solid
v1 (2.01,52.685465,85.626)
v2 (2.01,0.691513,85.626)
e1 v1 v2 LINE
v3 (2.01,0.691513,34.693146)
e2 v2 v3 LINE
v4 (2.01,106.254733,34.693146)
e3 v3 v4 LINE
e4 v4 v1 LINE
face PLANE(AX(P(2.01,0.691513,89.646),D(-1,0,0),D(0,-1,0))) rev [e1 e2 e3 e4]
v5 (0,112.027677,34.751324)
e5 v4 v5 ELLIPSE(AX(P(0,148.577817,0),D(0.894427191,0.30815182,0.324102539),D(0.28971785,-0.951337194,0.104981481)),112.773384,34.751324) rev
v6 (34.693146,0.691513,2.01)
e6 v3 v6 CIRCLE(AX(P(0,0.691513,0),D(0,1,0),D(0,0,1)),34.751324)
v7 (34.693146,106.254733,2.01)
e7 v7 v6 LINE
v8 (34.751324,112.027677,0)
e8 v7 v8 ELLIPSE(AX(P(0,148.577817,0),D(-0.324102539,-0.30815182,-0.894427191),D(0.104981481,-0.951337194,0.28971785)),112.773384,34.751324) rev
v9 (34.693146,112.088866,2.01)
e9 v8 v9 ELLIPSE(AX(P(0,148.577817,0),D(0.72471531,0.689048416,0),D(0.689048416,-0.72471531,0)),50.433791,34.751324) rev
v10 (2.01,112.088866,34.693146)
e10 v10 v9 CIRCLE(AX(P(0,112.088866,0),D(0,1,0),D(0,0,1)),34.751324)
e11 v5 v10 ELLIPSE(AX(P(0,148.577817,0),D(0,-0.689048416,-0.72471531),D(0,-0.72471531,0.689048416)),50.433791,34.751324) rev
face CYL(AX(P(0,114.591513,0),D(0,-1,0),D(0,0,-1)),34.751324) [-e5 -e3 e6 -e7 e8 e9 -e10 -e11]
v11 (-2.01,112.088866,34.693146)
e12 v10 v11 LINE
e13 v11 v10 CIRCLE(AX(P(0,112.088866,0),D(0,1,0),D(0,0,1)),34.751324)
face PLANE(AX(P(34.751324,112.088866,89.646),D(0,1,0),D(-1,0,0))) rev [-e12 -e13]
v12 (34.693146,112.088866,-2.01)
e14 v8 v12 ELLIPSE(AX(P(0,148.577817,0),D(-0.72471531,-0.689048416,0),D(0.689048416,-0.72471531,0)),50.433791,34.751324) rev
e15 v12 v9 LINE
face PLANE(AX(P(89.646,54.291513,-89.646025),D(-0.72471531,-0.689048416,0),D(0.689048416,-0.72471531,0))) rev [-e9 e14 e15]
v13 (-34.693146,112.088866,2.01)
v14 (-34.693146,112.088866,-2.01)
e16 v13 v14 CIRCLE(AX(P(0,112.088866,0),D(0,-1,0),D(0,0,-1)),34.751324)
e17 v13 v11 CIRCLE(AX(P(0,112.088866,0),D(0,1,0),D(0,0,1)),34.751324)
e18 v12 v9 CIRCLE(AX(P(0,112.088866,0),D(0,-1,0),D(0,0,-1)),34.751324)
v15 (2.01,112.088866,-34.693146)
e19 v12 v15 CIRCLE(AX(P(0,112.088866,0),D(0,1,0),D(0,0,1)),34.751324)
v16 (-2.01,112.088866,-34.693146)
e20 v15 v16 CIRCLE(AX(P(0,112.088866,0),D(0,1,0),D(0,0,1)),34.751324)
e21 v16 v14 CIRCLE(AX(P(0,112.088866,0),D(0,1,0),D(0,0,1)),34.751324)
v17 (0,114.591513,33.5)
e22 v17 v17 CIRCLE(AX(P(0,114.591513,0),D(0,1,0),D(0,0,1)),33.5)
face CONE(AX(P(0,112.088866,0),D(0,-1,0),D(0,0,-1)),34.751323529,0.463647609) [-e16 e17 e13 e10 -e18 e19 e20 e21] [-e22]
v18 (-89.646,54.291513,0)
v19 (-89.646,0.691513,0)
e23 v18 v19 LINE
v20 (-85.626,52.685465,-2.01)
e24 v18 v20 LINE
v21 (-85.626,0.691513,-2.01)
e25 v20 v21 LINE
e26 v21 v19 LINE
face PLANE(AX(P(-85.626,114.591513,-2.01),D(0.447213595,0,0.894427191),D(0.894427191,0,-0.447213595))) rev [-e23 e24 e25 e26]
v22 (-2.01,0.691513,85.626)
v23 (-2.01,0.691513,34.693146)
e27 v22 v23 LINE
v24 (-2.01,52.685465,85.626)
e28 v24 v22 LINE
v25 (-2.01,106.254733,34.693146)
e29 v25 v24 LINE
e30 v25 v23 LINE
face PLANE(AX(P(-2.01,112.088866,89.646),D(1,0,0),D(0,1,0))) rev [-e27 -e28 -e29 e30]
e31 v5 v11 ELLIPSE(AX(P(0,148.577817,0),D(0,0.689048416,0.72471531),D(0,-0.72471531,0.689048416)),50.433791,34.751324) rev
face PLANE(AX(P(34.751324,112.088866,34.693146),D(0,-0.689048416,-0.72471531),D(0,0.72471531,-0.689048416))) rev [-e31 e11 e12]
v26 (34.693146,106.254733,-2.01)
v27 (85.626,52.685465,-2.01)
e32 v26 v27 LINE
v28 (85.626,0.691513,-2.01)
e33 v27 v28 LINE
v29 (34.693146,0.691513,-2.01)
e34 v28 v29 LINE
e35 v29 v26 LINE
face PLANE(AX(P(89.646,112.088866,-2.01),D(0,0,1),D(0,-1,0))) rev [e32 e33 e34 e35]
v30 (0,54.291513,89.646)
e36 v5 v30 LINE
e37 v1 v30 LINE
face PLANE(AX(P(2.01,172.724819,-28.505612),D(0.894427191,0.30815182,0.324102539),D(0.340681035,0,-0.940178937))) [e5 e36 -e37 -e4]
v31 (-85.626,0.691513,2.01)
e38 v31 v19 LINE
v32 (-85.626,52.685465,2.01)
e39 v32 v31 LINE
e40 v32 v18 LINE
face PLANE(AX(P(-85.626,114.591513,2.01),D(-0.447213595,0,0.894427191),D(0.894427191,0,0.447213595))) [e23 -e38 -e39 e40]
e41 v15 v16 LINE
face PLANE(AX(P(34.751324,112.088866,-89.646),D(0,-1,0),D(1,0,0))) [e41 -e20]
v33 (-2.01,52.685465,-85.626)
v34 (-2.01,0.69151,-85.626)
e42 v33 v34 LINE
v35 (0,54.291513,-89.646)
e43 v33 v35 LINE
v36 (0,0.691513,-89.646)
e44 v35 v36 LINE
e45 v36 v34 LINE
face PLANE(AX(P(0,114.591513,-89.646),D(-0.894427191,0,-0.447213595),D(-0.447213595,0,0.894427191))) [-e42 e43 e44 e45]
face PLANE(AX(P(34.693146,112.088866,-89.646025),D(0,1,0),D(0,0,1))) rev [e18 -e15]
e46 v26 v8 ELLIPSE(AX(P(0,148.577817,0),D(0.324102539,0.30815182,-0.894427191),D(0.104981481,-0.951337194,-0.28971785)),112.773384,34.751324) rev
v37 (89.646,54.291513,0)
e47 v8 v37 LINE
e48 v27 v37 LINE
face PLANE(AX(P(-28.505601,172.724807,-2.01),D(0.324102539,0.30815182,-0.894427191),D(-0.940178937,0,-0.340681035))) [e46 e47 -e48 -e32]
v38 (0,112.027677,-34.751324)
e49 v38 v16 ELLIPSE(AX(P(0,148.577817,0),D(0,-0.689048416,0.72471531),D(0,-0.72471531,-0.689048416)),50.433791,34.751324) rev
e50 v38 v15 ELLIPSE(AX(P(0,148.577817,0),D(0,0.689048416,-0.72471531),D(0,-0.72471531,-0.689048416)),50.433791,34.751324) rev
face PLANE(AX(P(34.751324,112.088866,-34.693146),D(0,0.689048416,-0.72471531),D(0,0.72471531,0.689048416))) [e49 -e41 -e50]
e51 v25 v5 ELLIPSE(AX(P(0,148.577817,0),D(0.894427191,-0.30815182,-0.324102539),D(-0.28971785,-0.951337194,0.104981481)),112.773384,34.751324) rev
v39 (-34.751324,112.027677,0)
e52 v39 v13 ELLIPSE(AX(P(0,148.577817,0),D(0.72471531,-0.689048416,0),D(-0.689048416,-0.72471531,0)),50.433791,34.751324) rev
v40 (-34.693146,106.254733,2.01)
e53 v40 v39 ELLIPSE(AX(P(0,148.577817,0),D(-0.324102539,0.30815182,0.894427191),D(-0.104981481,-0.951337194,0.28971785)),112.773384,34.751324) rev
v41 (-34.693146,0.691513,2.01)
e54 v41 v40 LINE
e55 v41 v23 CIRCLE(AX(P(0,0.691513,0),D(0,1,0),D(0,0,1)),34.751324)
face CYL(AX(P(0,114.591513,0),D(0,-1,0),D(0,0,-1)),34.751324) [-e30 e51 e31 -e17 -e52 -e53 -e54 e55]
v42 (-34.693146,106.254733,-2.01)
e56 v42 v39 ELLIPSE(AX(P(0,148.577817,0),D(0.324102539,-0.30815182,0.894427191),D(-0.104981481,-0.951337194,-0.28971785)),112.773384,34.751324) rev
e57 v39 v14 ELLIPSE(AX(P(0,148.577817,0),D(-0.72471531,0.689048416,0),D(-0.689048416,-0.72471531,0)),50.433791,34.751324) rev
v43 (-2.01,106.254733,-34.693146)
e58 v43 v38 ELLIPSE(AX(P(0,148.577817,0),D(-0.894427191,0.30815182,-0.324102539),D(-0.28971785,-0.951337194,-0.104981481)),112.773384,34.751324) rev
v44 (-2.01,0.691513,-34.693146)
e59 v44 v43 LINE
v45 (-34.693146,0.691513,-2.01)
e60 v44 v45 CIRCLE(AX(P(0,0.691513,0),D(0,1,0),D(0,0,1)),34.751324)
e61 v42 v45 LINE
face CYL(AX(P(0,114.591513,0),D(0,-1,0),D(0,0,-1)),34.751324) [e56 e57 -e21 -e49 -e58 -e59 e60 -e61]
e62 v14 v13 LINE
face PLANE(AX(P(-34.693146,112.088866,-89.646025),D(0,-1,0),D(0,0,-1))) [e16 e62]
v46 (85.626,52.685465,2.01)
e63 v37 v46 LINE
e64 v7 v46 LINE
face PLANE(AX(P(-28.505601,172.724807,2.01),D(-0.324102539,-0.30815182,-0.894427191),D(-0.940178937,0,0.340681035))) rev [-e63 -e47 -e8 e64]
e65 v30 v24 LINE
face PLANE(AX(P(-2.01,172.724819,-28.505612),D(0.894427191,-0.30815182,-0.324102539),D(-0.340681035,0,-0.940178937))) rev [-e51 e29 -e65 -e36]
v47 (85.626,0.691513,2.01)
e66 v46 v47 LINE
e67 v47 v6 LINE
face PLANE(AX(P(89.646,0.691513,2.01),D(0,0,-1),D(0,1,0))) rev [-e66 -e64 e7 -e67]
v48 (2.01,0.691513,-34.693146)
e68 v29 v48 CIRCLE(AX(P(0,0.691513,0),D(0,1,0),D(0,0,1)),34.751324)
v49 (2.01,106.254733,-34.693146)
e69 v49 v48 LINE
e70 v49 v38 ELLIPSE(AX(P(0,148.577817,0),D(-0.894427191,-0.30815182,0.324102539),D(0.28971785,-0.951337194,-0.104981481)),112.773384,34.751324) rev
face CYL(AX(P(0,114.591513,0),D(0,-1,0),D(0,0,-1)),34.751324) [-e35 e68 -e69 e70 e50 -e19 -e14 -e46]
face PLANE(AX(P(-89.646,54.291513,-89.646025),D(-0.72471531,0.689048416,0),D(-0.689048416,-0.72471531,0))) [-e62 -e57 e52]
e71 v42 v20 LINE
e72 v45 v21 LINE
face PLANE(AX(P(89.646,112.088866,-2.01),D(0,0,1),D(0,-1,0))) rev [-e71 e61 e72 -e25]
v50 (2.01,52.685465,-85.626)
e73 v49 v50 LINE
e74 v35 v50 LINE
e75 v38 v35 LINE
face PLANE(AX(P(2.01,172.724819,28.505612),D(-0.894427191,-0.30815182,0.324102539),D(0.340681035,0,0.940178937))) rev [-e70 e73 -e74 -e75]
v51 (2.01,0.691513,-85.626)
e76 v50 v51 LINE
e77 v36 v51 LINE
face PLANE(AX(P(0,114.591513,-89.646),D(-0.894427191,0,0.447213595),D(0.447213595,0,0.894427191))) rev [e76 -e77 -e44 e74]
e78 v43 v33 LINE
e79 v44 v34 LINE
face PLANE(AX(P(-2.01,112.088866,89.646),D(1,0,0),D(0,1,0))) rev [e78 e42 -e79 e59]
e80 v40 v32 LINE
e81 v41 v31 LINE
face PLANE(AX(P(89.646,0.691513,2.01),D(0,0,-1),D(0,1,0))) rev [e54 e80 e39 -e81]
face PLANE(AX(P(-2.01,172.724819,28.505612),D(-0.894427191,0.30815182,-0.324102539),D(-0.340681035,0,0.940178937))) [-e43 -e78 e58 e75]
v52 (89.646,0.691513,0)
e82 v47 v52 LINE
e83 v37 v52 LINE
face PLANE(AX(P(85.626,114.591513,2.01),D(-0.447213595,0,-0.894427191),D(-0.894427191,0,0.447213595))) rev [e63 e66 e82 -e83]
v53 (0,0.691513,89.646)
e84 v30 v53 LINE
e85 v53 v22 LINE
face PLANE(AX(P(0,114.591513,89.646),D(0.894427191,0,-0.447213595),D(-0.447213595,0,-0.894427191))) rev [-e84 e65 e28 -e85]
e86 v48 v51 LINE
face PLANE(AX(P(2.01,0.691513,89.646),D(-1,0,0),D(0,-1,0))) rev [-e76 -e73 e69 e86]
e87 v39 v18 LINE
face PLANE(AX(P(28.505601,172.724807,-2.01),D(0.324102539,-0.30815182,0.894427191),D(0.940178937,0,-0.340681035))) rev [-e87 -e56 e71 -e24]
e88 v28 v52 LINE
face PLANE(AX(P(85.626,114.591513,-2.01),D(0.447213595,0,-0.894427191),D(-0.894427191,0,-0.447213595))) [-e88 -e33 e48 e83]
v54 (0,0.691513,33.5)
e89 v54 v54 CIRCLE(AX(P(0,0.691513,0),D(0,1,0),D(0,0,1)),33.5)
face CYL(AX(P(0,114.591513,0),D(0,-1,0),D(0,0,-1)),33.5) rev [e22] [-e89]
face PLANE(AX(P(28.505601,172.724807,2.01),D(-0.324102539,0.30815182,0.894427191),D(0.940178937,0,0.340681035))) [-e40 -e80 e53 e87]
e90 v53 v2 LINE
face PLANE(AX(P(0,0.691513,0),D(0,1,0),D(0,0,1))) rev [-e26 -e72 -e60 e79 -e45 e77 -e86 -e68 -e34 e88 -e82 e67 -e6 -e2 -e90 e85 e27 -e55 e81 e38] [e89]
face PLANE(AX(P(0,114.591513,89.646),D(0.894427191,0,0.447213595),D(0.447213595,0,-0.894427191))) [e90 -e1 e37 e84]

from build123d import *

# Parameters (mm, degrees)
SKETCH1_R                                     = 35.27
SKETCH1_R_2                                   = 34
BOSS_EXTRUDE1_DEPTH                           = 115.6
SKETCH3_W                                     = 4.08
SKETCH3_H                                     = 113.06
BOSS_EXTRUDE2_DEPTH                           = 90.984
CUT_EXTRUDE1_DEPTH                            = 152.767863384
CUT_EXTRUDE4_DEPTH                            = 152.279281979
MIRROR4_AT_THE_SECOND_PLANE_COPY_1_DEPTH      = 152.279281979
CUT_EXTRUDE5_REACH                            = 175.905
CUT_EXTRUDE5_END_RADIUS                       = 35.27
MIRROR5_AT_THE_SECOND_PLANE_COPY_1_REACH      = 175.905
MIRROR5_AT_THE_SECOND_PLANE_COPY_1_END_RADIUS = 35.27
SKETCH12_W                                    = 4.08
SKETCH12_H                                    = 113.06
BOSS_EXTRUDE3_DEPTH                           = 90.984
CUT_EXTRUDE6_DEPTH                            = 175.054338734
CUT_EXTRUDE7_DEPTH                            = 173.972646716
MIRROR6_START                                 = -1
MIRROR6_DEPTH                                 = 114.06
MIRROR6_START_2                               = -2.04
MIRROR6_2_DEPTH                               = 4.08
MIRROR6_START_3                               = 40.689281773
MIRROR6_3_OUTLINE_W                           = 8
MIRROR6_3_OUTLINE_H                           = 61
MIRROR6_3_DEPTH                               = 3.310718227
CUT_EXTRUDE8_REACH                            = 195.073
CUT_EXTRUDE8_END_RADIUS                       = 35.27
MIRROR7_AT_THE_SECOND_PLANE_COPY_1_REACH      = 195.073
MIRROR7_AT_THE_SECOND_PLANE_COPY_1_END_RADIUS = 35.27
CUT_EXTRUDE9_DEPTH                            = 173.972646716
CUT_EXTRUDE9_DEPTH_BACK                       = 173.972646716
SKETCH17_R                                    = 34
SCALE2_SCALE                                  = 0.985294118


with BuildPart() as part:
    # Sketch1 → Boss-Extrude1 (new body)
    with BuildSketch(Plane(origin=(0, 0, 0), x_dir=(1, 0, 0), z_dir=(0, 1, 0))):
        with Locations(Location((0, 0, 0), (0, 0, 270))):
            Circle(SKETCH1_R)
        with Locations(Location((0, 0, 0), (0, 0, 270))):
            Circle(SKETCH1_R_2, mode=Mode.SUBTRACT)
    extrude(amount=BOSS_EXTRUDE1_DEPTH)

    # Sketch2 → Cut-Revolve3 (revolve, cut)
    with BuildSketch(Plane(origin=(0, 0, 0), x_dir=(0, 0, -1), z_dir=(1, 0, 0))):
        Polygon((-35.27, 113.06), (-35.27, 115.6), (-34, 115.6), align=None)
    revolve(axis=Axis((0, 115.6, 0), (0, -1, 0)), mode=Mode.SUBTRACT)

    # Sketch3 → Boss-Extrude2 (add, symmetric)
    with BuildSketch(Plane.XY):
        with Locations((0, 56.53)):
            Rectangle(SKETCH3_W, SKETCH3_H)
    extrude(amount=BOSS_EXTRUDE2_DEPTH, both=True)

    # Sketch4 → Cut-Extrude1 (cut, symmetric)
    with BuildSketch(Plane.ZY.offset(2.04)):
        Polygon((35.210954261, 113.06), (90.984, 54.4), (90.984, 113.06), align=None)
    cut_extrude1 = extrude(amount=CUT_EXTRUDE1_DEPTH, both=True, mode=Mode.SUBTRACT)

    # Mirror3: Cut-Extrude1 across plane
    add(cut_extrude1.mirror(Plane.XY), mode=Mode.SUBTRACT)

    # Sketch7 → Cut-Extrude4 (cut, symmetric)
    with BuildSketch(Plane.XZ):
        Polygon((0, 90.984), (-2.04, 86.904), (-2.04, 90.984), align=None)
    cut_extrude4 = extrude(amount=CUT_EXTRUDE4_DEPTH, both=True, mode=Mode.SUBTRACT)

    # Mirror4: Cut-Extrude4 across plane
    add(cut_extrude4.mirror(Plane(origin=(0, 0, 0), x_dir=(0, 0, 1), z_dir=(1, 0, 0))), mode=Mode.SUBTRACT)

    # Mirror4 at the second plane: Cut-Extrude4 across plane
    add(cut_extrude4.mirror(Plane.XY), mode=Mode.SUBTRACT)

    # Mirror4 at the second plane copy 1 sketc → Mirror4 at the second plane copy 1 (cut, symmetric)
    with BuildSketch(Plane(origin=(0, 0, 0), x_dir=(-1, 0, 0), z_dir=(0, -1, 0))):
        Polygon((0, 90.984), (-2.04, 86.904), (-2.04, 90.984), align=None)
    extrude(amount=MIRROR4_AT_THE_SECOND_PLANE_COPY_1_DEPTH, both=True, mode=Mode.SUBTRACT)

    # Cut-Extrude5: up to this cylinder (the profile starts outside it)
    cut_extrude5_end = Plane(origin=(0, 53.462894, 0), z_dir=(0, -1, 0)) * Cylinder(CUT_EXTRUDE5_END_RADIUS, 423.35, mode=Mode.PRIVATE)
    # Sketch11 → Cut-Extrude5 (cut, up to the surface)
    with BuildSketch(Plane(origin=(0, -16.862580362, -16.032687791), x_dir=(1, 0, 0), z_dir=(0, 0.7247153095275539, 0.6890484163949453)), mode=Mode.PRIVATE) as cut_extrude5_sk1:
        Polygon((0, 103.421731574), (-2.04, 103.421731574), (-2.04, 99.341731574), align=None)
    cut_extrude5_tool1 = extrude(cut_extrude5_sk1.sketch, amount=CUT_EXTRUDE5_REACH, mode=Mode.PRIVATE) - cut_extrude5_end
    cut_extrude5 = cut_extrude5_tool1.solids().sort_by_distance((-1.36, 53.462894, -89.998387))[0]
    add(cut_extrude5, mode=Mode.SUBTRACT)

    # Mirror5: Cut-Extrude5 across plane
    add(cut_extrude5.mirror(Plane(origin=(0, 0, 0), x_dir=(0, 0, 1), z_dir=(1, 0, 0))), mode=Mode.SUBTRACT)

    # Mirror5 at the second plane: Cut-Extrude5 across plane
    add(cut_extrude5.mirror(Plane.XY), mode=Mode.SUBTRACT)

    # Mirror5 at the second plane copy 1: up to this cylinder (the profile starts outside it)
    mirror5_at_the_second_plane_copy_1_end = Plane(origin=(0, 53.462894, 0), z_dir=(0, -1, 0)) * Cylinder(MIRROR5_AT_THE_SECOND_PLANE_COPY_1_END_RADIUS, 423.35, mode=Mode.PRIVATE)
    # Mirror5 at the second plane copy 1 sketc → Mirror5 at the second plane copy 1 (cut, up to the surface)
    with BuildSketch(Plane(origin=(0, -16.862580362, 16.032687791), x_dir=(-1, 0, 0), z_dir=(0, 0.7247153095275539, -0.6890484163949453)), mode=Mode.PRIVATE) as mirror5_at_the_second_plane_copy_1_sk1:
        Polygon((0, 103.421731574), (-2.04, 103.421731574), (-2.04, 99.341731574), align=None)
    mirror5_at_the_second_plane_copy_1_tool1 = extrude(mirror5_at_the_second_plane_copy_1_sk1.sketch, amount=MIRROR5_AT_THE_SECOND_PLANE_COPY_1_REACH, mode=Mode.PRIVATE) - mirror5_at_the_second_plane_copy_1_end
    add(mirror5_at_the_second_plane_copy_1_tool1.solids().sort_by_distance((-1.36, 53.462894, -89.998387))[0], mode=Mode.SUBTRACT)

    # Sketch12 → Boss-Extrude3 (add, symmetric)
    with BuildSketch(Plane(origin=(0, 0, 0), x_dir=(0, 0, -1), z_dir=(1, 0, 0))):
        with Locations((0, 56.53)):
            Rectangle(SKETCH12_W, SKETCH12_H)
    extrude(amount=BOSS_EXTRUDE3_DEPTH, both=True)

    # Sketch13 → Cut-Extrude6 (cut, through all)
    with BuildSketch(Plane.XY.offset(2.04)):
        Polygon((35.210954261, 113.06), (90.984, 113.06), (90.984, 54.4), align=None)
    extrude(amount=-CUT_EXTRUDE6_DEPTH, mode=Mode.SUBTRACT)

    # Sketch14 → Cut-Extrude7 (cut, through all)
    with BuildSketch(Plane.XZ):
        Polygon((90.984, 0), (90.984, 2.04), (86.904, 2.04), align=None)
    extrude(amount=-CUT_EXTRUDE7_DEPTH, mode=Mode.SUBTRACT)

    # Mirror6: read off the stored shape, not the designer's step
    # Mirror6 outline → Mirror6 (cut)
    with BuildSketch(Plane(origin=(0, 0, 0), x_dir=(1, 0, 0), z_dir=(0, 1, 0)).offset(MIRROR6_START)):
        Polygon((-90.984, 2.04), (-90.984, 0), (-86.904, 2.04), align=None)
        Polygon((-86.904, -2.04), (-90.984, 0), (-90.984, -2.04), align=None)
    extrude(amount=MIRROR6_DEPTH, mode=Mode.SUBTRACT)

    # Mirror6 2 outline → Mirror6 2 (cut)
    with BuildSketch(Plane.XY.offset(MIRROR6_START_2)):
        Polygon((-90.984, 54.4), (-35.210954261, 113.06), (-92, 113.06), (-92, 53.331409264), align=None)
    extrude(amount=MIRROR6_2_DEPTH, mode=Mode.SUBTRACT)

    # Mirror6 3 outline → Mirror6 3 (cut)
    with BuildSketch(Plane(origin=(0, 0, 0), x_dir=(0.8944271909999159, 0, 0.44721359549995804), z_dir=(0.447213595499958, 0, -0.894427190999916)).offset(MIRROR6_START_3)):
        with Locations((79, -29.5)):
            Rectangle(MIRROR6_3_OUTLINE_W, MIRROR6_3_OUTLINE_H)
    extrude(amount=MIRROR6_3_DEPTH, mode=Mode.SUBTRACT)

    # Cut-Extrude8: up to this cylinder (the profile starts outside it)
    cut_extrude8_end = Plane(origin=(0, 53.462894, 0), z_dir=(0, -1, 0)) * Cylinder(CUT_EXTRUDE8_END_RADIUS, 461.686, mode=Mode.PRIVATE)
    # Sketch15 → Cut-Extrude8 (cut, up to the surface)
    with BuildSketch(Plane(origin=(16.032687791, -16.862580362, 0), x_dir=(0.7247153095275543, 0.6890484163949449, 0), z_dir=(-0.6890484163949449, 0.7247153095275543, 0)), mode=Mode.PRIVATE) as cut_extrude8_sk1:
        Polygon((103.421731574, 0), (103.421731574, 2.04), (99.341731574, 2.04), align=None)
    cut_extrude8_tool1 = extrude(cut_extrude8_sk1.sketch, amount=CUT_EXTRUDE8_REACH, mode=Mode.PRIVATE) - cut_extrude8_end
    cut_extrude8 = cut_extrude8_tool1.solids().sort_by_distance((89.998387, 53.462894, -1.36))[0]
    add(cut_extrude8, mode=Mode.SUBTRACT)

    # Mirror7: Cut-Extrude8 across plane
    add(cut_extrude8.mirror(Plane(origin=(0, 0, 0), x_dir=(0, 0, 1), z_dir=(1, 0, 0))), mode=Mode.SUBTRACT)

    # Mirror7 at the second plane: Cut-Extrude8 across plane
    add(cut_extrude8.mirror(Plane.XY), mode=Mode.SUBTRACT)

    # Mirror7 at the second plane copy 1: up to this cylinder (the profile starts outside it)
    mirror7_at_the_second_plane_copy_1_end = Plane(origin=(0, 53.462894, 0), z_dir=(0, -1, 0)) * Cylinder(MIRROR7_AT_THE_SECOND_PLANE_COPY_1_END_RADIUS, 461.686, mode=Mode.PRIVATE)
    # Mirror7 at the second plane copy 1 sketc → Mirror7 at the second plane copy 1 (cut, up to the surface)
    with BuildSketch(Plane(origin=(-16.032687791, -16.862580362, 0), x_dir=(-0.7247153095275543, 0.6890484163949449, 0), z_dir=(0.6890484163949449, 0.7247153095275543, 0)), mode=Mode.PRIVATE) as mirror7_at_the_second_plane_copy_1_sk1:
        Polygon((103.421731574, 0), (103.421731574, 2.04), (99.341731574, 2.04), align=None)
    mirror7_at_the_second_plane_copy_1_tool1 = extrude(mirror7_at_the_second_plane_copy_1_sk1.sketch, amount=MIRROR7_AT_THE_SECOND_PLANE_COPY_1_REACH, mode=Mode.PRIVATE) - mirror7_at_the_second_plane_copy_1_end
    add(mirror7_at_the_second_plane_copy_1_tool1.solids().sort_by_distance((89.998387, 53.462894, -1.36))[0], mode=Mode.SUBTRACT)

    # Sketch17 → Cut-Extrude9 (cut, two sides: drawn at the far end of the back side and taken through both)
    with BuildSketch(Plane.XZ.offset(-CUT_EXTRUDE9_DEPTH_BACK)):
        with Locations(Location((0, 0, 0), (0, 0, 90))):
            Circle(SKETCH17_R)
    extrude(amount=CUT_EXTRUDE9_DEPTH + CUT_EXTRUDE9_DEPTH_BACK, mode=Mode.SUBTRACT)


with BuildPart() as part_1:
    # Scale2: scaled about (0, 47.022865963, 0)
    add(part.part.scale(SCALE2_SCALE).moved(Location((0, 0.691512735, 0))))


solid = part_1.part
